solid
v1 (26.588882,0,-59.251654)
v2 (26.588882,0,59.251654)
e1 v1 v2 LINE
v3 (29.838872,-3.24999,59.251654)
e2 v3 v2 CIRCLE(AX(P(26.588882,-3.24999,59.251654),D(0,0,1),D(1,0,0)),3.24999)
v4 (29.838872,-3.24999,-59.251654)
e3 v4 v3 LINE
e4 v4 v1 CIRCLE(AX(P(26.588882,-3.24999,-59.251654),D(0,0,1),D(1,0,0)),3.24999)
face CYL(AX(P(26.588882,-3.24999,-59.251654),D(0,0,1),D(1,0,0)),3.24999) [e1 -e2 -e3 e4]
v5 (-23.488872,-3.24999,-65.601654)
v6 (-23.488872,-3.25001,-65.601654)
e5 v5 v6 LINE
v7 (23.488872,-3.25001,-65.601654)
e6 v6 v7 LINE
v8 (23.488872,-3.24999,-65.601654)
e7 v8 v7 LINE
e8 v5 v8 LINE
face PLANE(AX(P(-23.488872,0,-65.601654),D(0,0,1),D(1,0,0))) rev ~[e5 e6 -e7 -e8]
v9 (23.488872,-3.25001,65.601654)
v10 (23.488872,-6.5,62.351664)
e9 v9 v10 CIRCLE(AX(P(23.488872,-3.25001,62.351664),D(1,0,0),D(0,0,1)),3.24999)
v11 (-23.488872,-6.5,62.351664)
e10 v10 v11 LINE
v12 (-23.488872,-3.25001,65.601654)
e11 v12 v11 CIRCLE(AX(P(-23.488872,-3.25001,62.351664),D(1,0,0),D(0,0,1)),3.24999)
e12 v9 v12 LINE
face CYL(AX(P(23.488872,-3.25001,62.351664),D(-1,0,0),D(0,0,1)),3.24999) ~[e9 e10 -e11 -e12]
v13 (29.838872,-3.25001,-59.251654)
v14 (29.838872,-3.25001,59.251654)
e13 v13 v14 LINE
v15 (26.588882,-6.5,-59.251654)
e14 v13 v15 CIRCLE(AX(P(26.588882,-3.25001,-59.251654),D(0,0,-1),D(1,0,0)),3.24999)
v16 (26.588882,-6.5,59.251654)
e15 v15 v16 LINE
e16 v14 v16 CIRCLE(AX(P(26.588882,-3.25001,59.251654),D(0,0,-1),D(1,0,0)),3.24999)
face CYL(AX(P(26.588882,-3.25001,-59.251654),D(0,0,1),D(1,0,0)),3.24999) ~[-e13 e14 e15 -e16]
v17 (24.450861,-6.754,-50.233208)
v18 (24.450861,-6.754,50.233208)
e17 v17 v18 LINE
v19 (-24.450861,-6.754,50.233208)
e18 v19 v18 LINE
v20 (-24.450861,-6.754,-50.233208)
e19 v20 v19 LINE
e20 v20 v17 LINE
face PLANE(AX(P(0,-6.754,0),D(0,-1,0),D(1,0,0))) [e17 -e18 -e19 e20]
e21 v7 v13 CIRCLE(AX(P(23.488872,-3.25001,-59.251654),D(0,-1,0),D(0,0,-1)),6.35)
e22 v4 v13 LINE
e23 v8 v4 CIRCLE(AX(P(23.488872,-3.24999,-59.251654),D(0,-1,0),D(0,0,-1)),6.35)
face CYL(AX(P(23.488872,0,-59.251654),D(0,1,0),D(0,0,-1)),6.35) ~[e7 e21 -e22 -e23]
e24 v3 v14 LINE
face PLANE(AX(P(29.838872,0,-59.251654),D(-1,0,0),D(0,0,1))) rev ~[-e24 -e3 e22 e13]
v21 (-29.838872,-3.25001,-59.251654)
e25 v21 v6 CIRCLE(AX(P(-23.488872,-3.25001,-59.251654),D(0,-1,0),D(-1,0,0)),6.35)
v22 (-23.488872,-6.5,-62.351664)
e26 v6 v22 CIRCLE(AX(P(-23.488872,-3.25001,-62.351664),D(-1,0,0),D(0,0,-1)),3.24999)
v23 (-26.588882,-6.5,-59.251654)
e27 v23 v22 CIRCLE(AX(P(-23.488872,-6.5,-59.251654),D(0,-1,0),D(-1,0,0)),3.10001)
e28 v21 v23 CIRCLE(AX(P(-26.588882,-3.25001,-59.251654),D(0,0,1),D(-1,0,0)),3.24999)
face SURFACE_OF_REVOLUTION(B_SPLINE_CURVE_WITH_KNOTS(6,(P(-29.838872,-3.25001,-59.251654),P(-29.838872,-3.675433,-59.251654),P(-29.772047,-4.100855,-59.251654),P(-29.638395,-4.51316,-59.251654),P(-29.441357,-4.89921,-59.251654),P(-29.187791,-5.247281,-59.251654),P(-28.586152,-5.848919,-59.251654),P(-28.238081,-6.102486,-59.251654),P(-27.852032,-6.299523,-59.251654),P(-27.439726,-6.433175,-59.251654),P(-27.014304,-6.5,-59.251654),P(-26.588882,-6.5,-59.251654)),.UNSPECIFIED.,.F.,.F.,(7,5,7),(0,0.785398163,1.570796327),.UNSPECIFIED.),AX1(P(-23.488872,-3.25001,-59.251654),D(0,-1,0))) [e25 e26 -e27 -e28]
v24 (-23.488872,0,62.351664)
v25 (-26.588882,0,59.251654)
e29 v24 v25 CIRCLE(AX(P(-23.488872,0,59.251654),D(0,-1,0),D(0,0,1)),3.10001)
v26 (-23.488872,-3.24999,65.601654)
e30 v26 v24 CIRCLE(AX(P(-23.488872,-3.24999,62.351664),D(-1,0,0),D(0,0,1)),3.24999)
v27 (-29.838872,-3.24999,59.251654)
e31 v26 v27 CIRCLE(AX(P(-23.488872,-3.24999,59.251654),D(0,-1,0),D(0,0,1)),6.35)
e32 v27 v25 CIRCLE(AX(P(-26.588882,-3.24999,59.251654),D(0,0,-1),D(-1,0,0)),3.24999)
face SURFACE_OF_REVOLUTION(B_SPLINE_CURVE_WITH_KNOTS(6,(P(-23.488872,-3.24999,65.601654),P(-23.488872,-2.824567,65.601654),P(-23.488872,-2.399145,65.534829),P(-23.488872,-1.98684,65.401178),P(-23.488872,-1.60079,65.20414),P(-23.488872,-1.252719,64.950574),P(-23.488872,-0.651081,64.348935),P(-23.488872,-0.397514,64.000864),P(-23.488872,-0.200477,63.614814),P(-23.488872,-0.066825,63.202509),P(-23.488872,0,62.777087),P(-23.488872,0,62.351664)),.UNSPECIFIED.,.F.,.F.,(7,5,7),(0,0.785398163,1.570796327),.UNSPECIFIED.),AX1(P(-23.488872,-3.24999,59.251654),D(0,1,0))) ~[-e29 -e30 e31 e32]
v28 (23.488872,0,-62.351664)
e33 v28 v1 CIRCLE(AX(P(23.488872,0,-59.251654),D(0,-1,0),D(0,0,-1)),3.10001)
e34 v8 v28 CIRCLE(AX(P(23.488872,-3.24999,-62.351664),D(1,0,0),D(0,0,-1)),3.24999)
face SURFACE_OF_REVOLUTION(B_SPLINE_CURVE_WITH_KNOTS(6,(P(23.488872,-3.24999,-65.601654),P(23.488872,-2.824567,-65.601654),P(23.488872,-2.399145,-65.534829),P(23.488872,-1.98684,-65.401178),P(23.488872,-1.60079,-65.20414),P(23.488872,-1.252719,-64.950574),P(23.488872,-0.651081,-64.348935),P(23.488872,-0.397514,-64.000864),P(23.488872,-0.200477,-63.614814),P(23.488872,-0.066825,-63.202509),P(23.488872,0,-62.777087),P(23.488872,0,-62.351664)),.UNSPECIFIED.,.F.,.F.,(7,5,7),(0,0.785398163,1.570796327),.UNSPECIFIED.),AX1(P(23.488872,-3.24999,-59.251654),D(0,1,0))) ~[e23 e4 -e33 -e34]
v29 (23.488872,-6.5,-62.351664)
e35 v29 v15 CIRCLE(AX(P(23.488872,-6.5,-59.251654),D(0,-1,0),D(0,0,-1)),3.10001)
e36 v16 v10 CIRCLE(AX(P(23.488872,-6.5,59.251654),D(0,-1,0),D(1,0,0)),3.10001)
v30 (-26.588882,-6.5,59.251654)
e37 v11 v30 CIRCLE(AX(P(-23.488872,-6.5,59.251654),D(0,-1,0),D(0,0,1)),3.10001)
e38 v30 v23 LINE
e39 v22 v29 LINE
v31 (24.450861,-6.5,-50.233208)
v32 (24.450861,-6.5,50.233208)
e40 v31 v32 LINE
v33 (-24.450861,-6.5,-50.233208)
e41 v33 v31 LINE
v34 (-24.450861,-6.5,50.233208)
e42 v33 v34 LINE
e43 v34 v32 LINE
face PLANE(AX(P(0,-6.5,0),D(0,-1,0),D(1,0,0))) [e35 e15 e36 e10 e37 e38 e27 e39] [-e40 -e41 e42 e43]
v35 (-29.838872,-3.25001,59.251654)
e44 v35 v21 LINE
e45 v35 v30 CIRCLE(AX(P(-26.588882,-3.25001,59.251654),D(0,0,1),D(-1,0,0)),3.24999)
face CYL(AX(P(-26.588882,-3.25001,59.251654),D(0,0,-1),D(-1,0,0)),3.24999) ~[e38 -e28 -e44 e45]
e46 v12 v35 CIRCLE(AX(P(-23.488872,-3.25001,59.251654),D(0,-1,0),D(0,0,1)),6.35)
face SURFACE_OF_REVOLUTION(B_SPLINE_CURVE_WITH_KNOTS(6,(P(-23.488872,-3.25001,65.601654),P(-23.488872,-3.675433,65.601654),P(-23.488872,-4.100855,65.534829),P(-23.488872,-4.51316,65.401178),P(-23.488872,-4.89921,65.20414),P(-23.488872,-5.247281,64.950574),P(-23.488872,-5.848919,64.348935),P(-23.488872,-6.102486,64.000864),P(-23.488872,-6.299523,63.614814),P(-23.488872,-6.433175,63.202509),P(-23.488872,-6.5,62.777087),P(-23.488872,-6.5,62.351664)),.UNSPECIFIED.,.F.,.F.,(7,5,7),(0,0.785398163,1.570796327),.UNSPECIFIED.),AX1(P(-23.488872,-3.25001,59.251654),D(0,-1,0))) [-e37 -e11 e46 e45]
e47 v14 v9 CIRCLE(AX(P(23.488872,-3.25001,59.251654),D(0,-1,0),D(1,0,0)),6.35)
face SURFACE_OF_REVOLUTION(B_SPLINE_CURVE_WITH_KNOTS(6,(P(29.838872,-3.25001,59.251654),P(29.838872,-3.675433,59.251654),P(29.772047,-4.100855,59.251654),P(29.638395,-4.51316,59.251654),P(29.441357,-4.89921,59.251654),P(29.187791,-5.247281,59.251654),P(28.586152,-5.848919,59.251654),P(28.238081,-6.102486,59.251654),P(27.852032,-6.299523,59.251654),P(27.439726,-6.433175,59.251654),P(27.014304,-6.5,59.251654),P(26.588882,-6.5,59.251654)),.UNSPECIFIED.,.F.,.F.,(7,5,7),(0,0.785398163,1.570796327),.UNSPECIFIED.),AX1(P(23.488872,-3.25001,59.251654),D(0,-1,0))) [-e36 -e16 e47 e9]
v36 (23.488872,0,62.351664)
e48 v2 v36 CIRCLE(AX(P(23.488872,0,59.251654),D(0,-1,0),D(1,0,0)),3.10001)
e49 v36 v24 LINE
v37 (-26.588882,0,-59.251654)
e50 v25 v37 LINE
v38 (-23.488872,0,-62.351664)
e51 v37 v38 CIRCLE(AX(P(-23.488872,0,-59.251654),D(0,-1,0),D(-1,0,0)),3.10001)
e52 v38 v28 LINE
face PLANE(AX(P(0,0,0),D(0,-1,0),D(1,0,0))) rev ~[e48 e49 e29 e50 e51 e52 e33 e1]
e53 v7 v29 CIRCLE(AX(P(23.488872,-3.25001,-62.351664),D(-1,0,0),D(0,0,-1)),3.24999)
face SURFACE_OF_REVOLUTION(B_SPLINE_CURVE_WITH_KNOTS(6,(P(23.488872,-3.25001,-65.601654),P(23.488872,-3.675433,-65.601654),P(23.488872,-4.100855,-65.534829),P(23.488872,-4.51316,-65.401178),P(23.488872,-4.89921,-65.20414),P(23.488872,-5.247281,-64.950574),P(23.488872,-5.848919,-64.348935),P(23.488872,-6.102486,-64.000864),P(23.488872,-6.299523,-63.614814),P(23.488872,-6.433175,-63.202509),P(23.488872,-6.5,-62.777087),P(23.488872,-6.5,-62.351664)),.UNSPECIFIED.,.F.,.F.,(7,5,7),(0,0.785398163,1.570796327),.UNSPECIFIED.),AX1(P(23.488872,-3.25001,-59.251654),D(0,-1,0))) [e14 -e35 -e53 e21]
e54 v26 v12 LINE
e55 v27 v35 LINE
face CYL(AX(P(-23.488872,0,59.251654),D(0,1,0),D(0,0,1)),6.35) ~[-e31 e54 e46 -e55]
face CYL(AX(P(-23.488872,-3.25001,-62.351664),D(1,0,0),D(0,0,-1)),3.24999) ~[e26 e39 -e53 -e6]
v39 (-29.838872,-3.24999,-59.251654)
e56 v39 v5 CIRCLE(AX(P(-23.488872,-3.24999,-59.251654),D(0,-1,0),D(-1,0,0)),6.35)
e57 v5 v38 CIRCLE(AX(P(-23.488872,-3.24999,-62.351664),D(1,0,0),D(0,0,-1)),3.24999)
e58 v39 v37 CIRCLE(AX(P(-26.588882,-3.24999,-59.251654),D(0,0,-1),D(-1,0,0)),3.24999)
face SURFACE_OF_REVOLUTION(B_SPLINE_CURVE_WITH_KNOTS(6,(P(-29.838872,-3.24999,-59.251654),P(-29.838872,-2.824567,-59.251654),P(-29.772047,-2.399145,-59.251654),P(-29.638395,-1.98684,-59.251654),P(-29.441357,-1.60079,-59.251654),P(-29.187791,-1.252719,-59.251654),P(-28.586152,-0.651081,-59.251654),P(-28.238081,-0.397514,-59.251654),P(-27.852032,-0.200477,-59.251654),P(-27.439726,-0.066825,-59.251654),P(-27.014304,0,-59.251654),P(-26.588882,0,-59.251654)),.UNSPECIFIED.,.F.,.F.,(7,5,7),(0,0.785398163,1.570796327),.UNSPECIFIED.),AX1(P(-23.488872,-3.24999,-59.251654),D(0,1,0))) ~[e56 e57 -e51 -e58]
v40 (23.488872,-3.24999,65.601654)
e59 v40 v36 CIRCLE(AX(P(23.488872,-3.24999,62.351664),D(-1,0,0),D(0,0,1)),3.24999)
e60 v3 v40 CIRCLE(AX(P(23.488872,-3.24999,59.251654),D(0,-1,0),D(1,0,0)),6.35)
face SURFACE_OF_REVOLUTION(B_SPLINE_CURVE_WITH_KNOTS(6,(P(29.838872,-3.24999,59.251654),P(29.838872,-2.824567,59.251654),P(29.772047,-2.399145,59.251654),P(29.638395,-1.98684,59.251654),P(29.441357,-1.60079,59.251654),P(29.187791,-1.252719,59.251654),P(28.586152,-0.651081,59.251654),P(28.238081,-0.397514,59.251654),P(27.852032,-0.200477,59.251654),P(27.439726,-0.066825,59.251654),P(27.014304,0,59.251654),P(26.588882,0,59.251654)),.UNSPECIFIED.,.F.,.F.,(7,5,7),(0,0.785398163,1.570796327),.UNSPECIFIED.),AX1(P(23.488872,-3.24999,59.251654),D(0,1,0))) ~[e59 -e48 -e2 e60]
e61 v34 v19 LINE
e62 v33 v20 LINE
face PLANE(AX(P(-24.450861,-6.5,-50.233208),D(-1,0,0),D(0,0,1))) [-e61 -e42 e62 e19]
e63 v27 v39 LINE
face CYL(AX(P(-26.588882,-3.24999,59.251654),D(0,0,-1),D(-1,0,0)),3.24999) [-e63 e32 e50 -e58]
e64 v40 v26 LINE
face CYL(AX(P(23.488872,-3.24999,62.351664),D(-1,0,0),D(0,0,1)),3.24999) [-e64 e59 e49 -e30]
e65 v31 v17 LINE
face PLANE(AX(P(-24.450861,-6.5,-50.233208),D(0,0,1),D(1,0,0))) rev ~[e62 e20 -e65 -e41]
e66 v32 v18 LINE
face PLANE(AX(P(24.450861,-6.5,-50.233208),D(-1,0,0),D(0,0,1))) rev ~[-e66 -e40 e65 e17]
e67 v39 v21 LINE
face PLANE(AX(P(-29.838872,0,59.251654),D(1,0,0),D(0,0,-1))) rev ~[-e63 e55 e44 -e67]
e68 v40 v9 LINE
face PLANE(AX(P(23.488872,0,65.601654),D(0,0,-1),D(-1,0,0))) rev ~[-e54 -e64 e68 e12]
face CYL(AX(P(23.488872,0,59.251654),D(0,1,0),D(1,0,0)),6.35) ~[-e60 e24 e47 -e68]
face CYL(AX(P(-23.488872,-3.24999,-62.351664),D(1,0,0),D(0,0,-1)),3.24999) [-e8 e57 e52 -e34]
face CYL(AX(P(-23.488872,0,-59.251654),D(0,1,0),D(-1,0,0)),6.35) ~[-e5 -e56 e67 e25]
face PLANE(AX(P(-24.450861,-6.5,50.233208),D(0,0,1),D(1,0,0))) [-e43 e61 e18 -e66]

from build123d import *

# Parameters (mm, degrees)
F1_DEPTH = 6.5
F2_R     = 3.24999
F5_R     = 4.1935700789
F6_DEPTH = 0.254
F7_W     = 48.9017218351
F7_H     = 100.4664152861
F8_DEPTH = 0.254


# Not quite as in the source:
# - a fillet or chamfer is up to 0.001 mm smaller than in the source, because OpenCascade refuses the exact size
# - the program builds the solid bodies; features that only make, move or delete a surface that nothing else refers to are left out


with BuildPart() as f1:
    # F0 (on Front) → F1 (new body)
    with BuildSketch(Plane.XZ):
        with BuildLine():
            ThreePointArc((29.8388717587, 59.2516543508), (27.9789998192, 63.7417824113), (23.4888717587, 65.6016543508))
            Line((23.4888717587, 65.6016543508), (-23.4888717587, 65.6016543508))
            ThreePointArc((-23.4888717587, 65.6016543508), (-27.9789998192, 63.7417824113), (-29.8388717587, 59.2516543508))
            Line((-29.8388717587, 59.2516543508), (-29.8388717587, -59.2516543508))
            ThreePointArc((-29.8388717587, -59.2516543508), (-27.9789998192, -63.7417824113), (-23.4888717587, -65.6016543508))
            Line((-23.4888717587, -65.6016543508), (23.4888717587, -65.6016543508))
            ThreePointArc((23.4888717587, -65.6016543508), (27.9789998192, -63.7417824113), (29.8388717587, -59.2516543508))
            Line((29.8388717587, -59.2516543508), (29.8388717587, 59.2516543508))
        make_face()
    extrude(amount=F1_DEPTH)

    # F2 (radius 3.25 in the source; OpenCascade refuses exactly that, so slightly less here)
    f2_edges = [f1.edges().sort_by_distance(p)[0] for p in [
        (29.838872, 0, 0),
        (29.838872, -6.5, 0),
        (-29.838872, -6.5, 0),
        (0, 0, 65.601654),
        (0, -6.5, 65.601654),
        (-27.979, -6.5, 63.741782),
        (-27.979, 0, 63.741782),
        (27.979, -6.5, 63.741782),
        (27.979, 0, 63.741782),
        (27.979, -6.5, -63.741782),
        (0, -6.5, -65.601654),
        (-27.979, -6.5, -63.741782),
        (27.979, 0, -63.741782),
        (0, 0, -65.601654),
        (-27.979, 0, -63.741782),
        (-29.838872, -3.25, 59.251654),
        (-29.838872, -3.25, -59.251654),
        (-29.838872, 0, 0),
    ]]
    fillet(f2_edges, radius=F2_R)

    # F5 (on Front) → F6 (join)
    with BuildSketch(Plane.XZ):
        with Locations((0, -55.7777807117)):
            Circle(F5_R)
    extrude(amount=F6_DEPTH)

    # F7 (on face) → F8 (join)
    with BuildSketch(Plane.XZ.offset(6.5)):
        Rectangle(F7_W, F7_H)
    extrude(amount=F8_DEPTH)


solid = f1.part
